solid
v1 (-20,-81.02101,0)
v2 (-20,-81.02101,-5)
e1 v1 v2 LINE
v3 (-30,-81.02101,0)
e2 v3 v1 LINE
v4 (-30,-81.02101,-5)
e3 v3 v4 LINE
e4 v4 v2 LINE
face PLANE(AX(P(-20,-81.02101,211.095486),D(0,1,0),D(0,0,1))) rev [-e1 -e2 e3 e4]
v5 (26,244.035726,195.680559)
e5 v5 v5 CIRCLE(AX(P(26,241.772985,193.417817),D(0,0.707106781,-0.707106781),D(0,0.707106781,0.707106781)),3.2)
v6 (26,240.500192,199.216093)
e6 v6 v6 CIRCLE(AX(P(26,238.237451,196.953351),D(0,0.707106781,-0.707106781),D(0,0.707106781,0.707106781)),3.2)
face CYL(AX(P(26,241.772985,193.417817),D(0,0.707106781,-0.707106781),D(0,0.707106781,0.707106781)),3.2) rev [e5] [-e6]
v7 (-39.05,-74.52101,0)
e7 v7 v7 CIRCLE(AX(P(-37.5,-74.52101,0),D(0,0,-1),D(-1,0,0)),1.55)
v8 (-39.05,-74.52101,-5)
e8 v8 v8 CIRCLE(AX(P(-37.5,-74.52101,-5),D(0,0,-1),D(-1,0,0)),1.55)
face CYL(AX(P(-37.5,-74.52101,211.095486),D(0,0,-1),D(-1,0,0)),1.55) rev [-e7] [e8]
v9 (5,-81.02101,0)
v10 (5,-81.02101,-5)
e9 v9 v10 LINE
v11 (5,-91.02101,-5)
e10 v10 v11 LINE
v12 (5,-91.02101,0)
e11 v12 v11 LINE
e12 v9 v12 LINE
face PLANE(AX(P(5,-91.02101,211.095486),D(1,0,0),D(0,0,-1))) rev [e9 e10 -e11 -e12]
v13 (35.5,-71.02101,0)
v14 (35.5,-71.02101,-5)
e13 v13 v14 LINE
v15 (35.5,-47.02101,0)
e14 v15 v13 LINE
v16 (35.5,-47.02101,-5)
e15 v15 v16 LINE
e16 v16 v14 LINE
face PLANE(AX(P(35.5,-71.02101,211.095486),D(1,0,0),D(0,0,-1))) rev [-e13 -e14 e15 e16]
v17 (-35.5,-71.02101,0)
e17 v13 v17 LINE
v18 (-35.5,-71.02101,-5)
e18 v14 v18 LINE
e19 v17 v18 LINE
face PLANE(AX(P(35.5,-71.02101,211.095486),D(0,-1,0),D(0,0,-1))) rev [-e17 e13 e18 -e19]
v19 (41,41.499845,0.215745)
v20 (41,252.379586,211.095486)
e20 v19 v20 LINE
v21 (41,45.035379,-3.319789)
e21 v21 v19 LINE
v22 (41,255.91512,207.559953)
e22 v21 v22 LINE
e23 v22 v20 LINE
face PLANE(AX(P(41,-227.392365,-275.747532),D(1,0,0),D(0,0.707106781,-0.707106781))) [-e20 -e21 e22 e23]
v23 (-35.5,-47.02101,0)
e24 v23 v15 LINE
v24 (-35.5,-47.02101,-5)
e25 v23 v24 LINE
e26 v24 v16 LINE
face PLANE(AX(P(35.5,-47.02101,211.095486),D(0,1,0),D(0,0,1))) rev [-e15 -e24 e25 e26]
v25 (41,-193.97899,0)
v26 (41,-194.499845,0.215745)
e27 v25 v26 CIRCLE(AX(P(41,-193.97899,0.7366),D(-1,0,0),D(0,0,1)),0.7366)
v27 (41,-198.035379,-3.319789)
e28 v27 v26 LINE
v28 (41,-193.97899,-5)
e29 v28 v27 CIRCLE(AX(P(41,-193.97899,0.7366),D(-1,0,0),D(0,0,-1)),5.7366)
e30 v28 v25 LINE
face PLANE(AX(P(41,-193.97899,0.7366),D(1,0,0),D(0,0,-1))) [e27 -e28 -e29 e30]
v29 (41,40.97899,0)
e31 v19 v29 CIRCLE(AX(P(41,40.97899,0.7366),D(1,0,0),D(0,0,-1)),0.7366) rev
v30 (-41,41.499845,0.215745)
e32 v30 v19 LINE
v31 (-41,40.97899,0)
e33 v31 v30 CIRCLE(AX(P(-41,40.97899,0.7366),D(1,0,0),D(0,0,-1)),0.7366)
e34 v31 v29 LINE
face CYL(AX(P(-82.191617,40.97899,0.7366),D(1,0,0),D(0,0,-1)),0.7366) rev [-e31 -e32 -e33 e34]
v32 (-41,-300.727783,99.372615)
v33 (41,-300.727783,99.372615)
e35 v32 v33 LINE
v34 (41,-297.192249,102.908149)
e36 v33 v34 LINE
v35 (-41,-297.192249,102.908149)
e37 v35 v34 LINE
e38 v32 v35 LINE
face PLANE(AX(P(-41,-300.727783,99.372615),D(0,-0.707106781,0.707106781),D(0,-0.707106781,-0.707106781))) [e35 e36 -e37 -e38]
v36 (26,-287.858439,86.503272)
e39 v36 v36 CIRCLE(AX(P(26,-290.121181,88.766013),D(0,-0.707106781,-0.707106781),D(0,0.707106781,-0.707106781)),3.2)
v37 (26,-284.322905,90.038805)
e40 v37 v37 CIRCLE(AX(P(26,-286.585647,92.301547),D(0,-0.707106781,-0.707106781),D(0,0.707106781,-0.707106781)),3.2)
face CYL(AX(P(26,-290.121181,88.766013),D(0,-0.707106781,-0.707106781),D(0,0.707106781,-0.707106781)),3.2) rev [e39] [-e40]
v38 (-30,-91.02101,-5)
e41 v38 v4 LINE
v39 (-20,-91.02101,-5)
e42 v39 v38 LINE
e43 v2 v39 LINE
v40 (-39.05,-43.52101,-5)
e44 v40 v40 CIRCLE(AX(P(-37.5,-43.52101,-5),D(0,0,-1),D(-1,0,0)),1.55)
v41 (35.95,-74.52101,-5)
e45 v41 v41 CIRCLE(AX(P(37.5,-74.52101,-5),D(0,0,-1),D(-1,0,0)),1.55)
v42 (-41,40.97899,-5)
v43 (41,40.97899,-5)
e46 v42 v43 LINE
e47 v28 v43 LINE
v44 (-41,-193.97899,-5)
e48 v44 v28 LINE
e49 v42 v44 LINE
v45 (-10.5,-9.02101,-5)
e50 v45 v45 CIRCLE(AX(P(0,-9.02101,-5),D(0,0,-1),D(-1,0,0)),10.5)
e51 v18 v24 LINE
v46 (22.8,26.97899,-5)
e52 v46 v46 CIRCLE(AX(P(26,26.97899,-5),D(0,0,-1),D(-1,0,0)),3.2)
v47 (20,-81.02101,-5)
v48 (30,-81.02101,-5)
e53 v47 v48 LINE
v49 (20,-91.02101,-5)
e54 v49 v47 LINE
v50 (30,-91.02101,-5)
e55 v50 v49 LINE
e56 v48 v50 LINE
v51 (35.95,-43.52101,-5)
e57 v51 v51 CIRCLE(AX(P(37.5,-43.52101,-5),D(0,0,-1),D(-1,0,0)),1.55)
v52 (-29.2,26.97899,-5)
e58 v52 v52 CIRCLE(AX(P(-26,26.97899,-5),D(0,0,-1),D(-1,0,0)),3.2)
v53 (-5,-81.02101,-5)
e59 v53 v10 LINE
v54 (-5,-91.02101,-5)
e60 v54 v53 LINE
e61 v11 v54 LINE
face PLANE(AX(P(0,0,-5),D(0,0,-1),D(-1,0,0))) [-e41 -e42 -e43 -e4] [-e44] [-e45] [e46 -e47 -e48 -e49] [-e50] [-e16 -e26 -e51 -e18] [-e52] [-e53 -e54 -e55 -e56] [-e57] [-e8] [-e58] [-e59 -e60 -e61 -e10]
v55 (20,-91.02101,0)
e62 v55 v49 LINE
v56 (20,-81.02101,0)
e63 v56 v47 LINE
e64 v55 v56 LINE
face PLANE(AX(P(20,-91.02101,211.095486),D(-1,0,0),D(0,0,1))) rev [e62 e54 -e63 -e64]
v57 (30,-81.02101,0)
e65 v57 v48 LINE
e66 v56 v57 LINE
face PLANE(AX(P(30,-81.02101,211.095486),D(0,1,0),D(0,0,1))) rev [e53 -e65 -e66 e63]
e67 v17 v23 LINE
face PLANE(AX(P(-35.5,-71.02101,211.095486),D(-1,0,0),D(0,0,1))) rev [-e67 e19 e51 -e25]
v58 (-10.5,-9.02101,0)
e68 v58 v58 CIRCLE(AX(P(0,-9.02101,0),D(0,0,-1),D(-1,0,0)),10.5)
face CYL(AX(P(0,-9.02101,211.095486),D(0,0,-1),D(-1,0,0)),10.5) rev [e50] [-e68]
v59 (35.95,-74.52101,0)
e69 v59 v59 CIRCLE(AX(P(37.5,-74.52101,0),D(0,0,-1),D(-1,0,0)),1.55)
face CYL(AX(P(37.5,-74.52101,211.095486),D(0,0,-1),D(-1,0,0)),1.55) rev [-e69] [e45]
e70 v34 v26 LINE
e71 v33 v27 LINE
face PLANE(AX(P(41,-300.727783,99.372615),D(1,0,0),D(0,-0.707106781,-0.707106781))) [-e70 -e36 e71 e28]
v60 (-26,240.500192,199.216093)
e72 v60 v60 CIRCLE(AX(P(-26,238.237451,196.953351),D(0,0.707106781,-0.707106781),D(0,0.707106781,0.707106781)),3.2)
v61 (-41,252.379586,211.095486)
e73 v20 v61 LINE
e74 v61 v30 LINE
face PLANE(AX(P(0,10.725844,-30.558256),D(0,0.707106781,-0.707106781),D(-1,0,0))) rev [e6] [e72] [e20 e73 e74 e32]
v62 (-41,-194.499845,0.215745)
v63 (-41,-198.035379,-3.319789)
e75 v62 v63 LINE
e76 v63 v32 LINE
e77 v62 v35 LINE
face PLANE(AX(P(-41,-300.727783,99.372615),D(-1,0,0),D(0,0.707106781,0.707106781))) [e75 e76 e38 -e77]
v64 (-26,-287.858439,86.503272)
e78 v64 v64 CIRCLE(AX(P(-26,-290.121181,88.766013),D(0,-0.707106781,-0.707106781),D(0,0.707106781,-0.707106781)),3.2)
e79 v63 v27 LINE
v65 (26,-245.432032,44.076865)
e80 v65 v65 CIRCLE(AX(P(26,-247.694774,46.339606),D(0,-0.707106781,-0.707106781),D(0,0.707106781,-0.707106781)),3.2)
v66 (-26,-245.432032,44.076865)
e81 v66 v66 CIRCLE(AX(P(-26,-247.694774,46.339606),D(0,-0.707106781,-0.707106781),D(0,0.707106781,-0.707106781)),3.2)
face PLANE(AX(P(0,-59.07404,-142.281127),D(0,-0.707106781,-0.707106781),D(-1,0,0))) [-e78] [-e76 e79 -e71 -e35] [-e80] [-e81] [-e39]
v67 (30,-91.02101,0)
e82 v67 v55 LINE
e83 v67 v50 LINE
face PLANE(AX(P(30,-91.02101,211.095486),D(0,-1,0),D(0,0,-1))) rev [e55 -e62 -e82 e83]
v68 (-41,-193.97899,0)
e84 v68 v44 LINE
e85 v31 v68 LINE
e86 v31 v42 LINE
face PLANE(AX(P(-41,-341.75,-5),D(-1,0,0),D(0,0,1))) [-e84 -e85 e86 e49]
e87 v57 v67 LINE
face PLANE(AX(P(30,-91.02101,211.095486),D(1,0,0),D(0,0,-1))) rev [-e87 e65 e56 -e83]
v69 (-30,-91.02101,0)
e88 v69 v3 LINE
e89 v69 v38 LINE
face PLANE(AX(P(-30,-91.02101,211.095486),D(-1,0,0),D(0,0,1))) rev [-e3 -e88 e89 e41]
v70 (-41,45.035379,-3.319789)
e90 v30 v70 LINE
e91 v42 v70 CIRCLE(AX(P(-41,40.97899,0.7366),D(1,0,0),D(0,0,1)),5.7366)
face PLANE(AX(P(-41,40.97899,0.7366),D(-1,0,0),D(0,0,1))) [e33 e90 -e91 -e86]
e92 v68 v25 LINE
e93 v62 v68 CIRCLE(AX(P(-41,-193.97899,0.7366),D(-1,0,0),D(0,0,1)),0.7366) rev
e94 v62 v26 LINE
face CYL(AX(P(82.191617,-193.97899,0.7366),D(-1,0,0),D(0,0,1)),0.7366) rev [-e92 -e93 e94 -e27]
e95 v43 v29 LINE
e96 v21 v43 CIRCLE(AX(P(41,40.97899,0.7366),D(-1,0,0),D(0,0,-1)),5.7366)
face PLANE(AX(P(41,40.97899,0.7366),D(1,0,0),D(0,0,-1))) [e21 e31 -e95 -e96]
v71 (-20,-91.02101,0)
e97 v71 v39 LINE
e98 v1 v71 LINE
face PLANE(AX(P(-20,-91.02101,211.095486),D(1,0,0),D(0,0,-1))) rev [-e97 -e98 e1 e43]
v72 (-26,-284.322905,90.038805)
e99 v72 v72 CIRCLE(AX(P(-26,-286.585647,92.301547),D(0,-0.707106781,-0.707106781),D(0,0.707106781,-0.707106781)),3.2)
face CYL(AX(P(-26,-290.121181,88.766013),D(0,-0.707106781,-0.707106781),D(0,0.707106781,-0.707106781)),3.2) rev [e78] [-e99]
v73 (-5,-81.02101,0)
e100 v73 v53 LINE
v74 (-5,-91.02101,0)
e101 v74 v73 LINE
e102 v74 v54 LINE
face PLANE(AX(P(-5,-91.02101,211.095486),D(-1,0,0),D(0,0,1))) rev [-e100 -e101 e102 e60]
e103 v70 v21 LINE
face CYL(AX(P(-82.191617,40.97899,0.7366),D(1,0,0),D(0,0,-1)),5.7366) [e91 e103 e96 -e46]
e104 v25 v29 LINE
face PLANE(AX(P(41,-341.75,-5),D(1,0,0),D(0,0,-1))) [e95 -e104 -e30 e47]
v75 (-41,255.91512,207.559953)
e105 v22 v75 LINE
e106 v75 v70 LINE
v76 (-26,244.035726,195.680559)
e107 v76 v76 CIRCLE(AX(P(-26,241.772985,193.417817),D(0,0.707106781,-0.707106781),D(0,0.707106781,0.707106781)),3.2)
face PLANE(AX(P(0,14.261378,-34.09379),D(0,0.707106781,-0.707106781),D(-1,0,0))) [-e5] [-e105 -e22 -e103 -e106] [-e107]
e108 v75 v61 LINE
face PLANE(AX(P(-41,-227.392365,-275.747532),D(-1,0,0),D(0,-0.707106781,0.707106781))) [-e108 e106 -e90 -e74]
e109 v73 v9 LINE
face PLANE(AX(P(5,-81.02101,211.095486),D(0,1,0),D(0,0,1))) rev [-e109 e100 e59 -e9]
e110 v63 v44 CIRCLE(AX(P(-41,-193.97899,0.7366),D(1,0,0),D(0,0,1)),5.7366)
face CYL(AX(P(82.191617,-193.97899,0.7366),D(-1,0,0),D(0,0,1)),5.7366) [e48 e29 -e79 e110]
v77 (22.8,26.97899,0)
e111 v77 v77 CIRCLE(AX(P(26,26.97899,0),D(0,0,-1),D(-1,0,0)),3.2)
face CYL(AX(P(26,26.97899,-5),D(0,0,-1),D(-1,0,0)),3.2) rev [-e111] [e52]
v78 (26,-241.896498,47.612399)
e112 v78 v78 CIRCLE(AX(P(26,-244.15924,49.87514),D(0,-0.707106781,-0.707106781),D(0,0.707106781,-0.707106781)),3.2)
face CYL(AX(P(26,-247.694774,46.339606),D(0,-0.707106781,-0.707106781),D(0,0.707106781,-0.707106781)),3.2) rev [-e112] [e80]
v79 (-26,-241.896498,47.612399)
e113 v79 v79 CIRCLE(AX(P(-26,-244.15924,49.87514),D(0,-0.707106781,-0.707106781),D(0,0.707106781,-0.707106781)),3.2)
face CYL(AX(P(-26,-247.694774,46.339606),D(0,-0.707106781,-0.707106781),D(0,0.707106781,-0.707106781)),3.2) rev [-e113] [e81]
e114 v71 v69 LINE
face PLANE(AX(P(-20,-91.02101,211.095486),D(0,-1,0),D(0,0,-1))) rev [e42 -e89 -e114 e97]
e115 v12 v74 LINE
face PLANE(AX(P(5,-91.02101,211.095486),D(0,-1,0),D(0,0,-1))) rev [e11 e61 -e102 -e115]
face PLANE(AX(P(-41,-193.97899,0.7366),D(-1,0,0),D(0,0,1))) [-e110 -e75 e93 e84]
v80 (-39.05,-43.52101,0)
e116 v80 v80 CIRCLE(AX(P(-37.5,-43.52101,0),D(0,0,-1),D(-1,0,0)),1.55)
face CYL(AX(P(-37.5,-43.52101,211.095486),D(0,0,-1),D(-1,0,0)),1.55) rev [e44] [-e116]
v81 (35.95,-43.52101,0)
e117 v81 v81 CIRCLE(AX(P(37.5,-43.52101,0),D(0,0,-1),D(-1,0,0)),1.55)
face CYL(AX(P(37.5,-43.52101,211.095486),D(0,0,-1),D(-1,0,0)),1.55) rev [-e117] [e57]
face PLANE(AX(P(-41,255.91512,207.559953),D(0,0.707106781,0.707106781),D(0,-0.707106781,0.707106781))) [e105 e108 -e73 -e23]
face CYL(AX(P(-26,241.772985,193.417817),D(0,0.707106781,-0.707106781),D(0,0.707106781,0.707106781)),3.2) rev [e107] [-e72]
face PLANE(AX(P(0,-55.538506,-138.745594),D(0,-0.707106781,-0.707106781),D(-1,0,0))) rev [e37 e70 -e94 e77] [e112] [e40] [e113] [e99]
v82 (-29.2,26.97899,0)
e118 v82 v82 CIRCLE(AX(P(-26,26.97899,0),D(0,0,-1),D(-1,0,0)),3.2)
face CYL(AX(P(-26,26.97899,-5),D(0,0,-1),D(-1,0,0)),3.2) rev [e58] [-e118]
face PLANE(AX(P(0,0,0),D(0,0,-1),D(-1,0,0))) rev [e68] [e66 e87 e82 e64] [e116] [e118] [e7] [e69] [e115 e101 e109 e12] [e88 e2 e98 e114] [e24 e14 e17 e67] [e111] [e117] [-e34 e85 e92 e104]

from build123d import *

# Parameters (mm, degrees)
SKETCH1_W                = 82
SKETCH1_H                = 683.5
BASE_FLANGE1_DEPTH       = 5
SKETCHED_START           = -41
SKETCHED_BEND1_DEPTH     = 82
SKETCHED_BEND1_2_DEPTH   = 82
M6_CLEARANCE_HOLE1_D     = 6.4
M6_CLEARANCE_HOLE1_DEPTH = 5
M6_CLEARANCE_HOLE1_TIP   = 1.922753981
SKETCH8_R                = 10.5
CUT_EXTRUDE1_DEPTH       = 373.579466057
SKETCH9_R                = 1.55
SKETCH9_W                = 71
SKETCH9_H                = 24
SKETCH9_W_2              = 10
SKETCH9_H_2              = 10
CUT_EXTRUDE2_DEPTH       = 373.579466057
M6_CLEARANCE_HOLE3_D     = 6.4
M6_CLEARANCE_HOLE3_DEPTH = 5
M6_CLEARANCE_HOLE3_TIP   = 1.922753981
M6_CLEARANCE_HOLE4_D     = 6.4
M6_CLEARANCE_HOLE4_DEPTH = 5
M6_CLEARANCE_HOLE4_TIP   = 1.922753981


# Read off the part's stored shape, not the designer's step: Sketched Bend1
# Sheet-metal steps are written as plain solids
with BuildPart() as part:
    # Sketch1 → Base-Flange1 (new body)
    with BuildSketch(Plane.XY):
        Rectangle(SKETCH1_W, SKETCH1_H)
    extrude(amount=-BASE_FLANGE1_DEPTH)

    # Sketched Bend1 outline → Sketched Bend1 (cut)
    with BuildSketch(Plane.YZ.offset(SKETCHED_START)):
        with BuildLine():
            Line((-341.75, -5), (-193.978990152, -5))
            ThreePointArc((-193.978990152, -5), (-196.17429193, -4.563327326), (-198.035378913, -3.319788761))
            Line((-198.035378913, -3.319788761), (-201.355167674, 0))
            Line((-201.355167674, 0), (-341.75, 0))
            Line((-341.75, 0), (-341.75, -5))
        make_face()
        with BuildLine():
            ThreePointArc((45.035378913, -3.319788761), (43.17429193, -4.563327326), (40.978990152, -5))
            Line((40.978990152, -5), (341.75, -5))
            Line((341.75, -5), (341.75, 0))
            Line((341.75, 0), (48.355167674, 0))
            Line((48.355167674, 0), (45.035378913, -3.319788761))
        make_face()
    extrude(amount=SKETCHED_BEND1_DEPTH, mode=Mode.SUBTRACT)

    # Sketched Bend1 2 outline → Sketched Bend1 2 (add)
    with BuildSketch(Plane.YZ.offset(SKETCHED_START)):
        with BuildLine():
            Line((-300.727782675, 99.372615001), (-201.355167674, 0))
            Line((-201.355167674, 0), (-193.978990152, 0))
            ThreePointArc((-193.978990152, 0), (-194.260874768, 0.056070336), (-194.499845007, 0.215745145))
            Line((-194.499845007, 0.215745145), (-297.192248769, 102.908148906))
            Line((-297.192248769, 102.908148906), (-300.727782675, 99.372615001))
        make_face()
        with BuildLine():
            Line((40.978990152, 0), (48.355167674, 0))
            Line((48.355167674, 0), (255.915120196, 207.559952522))
            Line((255.915120196, 207.559952522), (252.37958629, 211.095486428))
            Line((252.37958629, 211.095486428), (41.499845007, 0.215745145))
            ThreePointArc((41.499845007, 0.215745145), (41.260874768, 0.056070336), (40.978990152, 0))
        make_face()
    extrude(amount=SKETCHED_BEND1_2_DEPTH)

    # M6 Clearance Hole1
    with Locations(Plane(origin=(0, 0, -5), x_dir=(-1, 0, 0), z_dir=(0, 0, -1))):
        with Locations((-26, 26.978990152), (26, 26.978990152)):
            Hole(M6_CLEARANCE_HOLE1_D / 2, depth=M6_CLEARANCE_HOLE1_DEPTH)
            with Locations((0, 0, -(M6_CLEARANCE_HOLE1_DEPTH + M6_CLEARANCE_HOLE1_TIP / 2))):  # 118° drill point
                Cone(0, M6_CLEARANCE_HOLE1_D / 2, M6_CLEARANCE_HOLE1_TIP, mode=Mode.SUBTRACT)

    # Sketch8 → Cut-Extrude1 (cut, through all)
    with BuildSketch(Plane(origin=(0, 0, -5), x_dir=(-1, 0, 0), z_dir=(0, 0, -1))):
        with Locations((0, -9.021009848)):
            Circle(SKETCH8_R)
    extrude(amount=-CUT_EXTRUDE1_DEPTH, mode=Mode.SUBTRACT)

    # Sketch9 → Cut-Extrude2 (cut, through all)
    with BuildSketch(Plane(origin=(0, 0, -5), x_dir=(-1, 0, 0), z_dir=(0, 0, -1))):
        with Locations((-37.5, -43.521009848)):
            Circle(SKETCH9_R)
        with Locations((-37.5, -74.521009848)):
            Circle(SKETCH9_R)
        with Locations((37.5, -74.521009848)):
            Circle(SKETCH9_R)
        with Locations((37.5, -43.521009848)):
            Circle(SKETCH9_R)
        with Locations((0, -59.021009848)):
            Rectangle(SKETCH9_W, SKETCH9_H)
        with Locations((0, -86.021009848)):
            Rectangle(SKETCH9_W_2, SKETCH9_H_2)
        with Locations((-25, -86.021009848)):
            Rectangle(SKETCH9_W_2, SKETCH9_H_2)
        with Locations((25, -86.021009848)):
            Rectangle(SKETCH9_W_2, SKETCH9_H_2)
    extrude(amount=-CUT_EXTRUDE2_DEPTH, mode=Mode.SUBTRACT)

    # M6 Clearance Hole3
    with Locations(Plane(origin=(0, -100.677583837, -100.677583837), x_dir=(-1, 0, 0), z_dir=(0, -0.7071067811865487, -0.7071067811865465))):
        with Locations((-26, -207.913704352), (26, -207.913704352), (26, -267.913704352), (-26, -267.913704352)):
            Hole(M6_CLEARANCE_HOLE3_D / 2, depth=M6_CLEARANCE_HOLE3_DEPTH)
            with Locations((0, 0, -(M6_CLEARANCE_HOLE3_DEPTH + M6_CLEARANCE_HOLE3_TIP / 2))):  # 118° drill point
                Cone(0, M6_CLEARANCE_HOLE3_D / 2, M6_CLEARANCE_HOLE3_TIP, mode=Mode.SUBTRACT)

    # M6 Clearance Hole4
    with Locations(Plane(origin=(0, 24.177583837, -24.177583837), x_dir=(1, 0, 0), z_dir=(0, 0.7071067811865487, -0.7071067811865465))):
        with Locations((-26, -307.72636683), (26, -307.72636683)):
            Hole(M6_CLEARANCE_HOLE4_D / 2, depth=M6_CLEARANCE_HOLE4_DEPTH)
            with Locations((0, 0, -(M6_CLEARANCE_HOLE4_DEPTH + M6_CLEARANCE_HOLE4_TIP / 2))):  # 118° drill point
                Cone(0, M6_CLEARANCE_HOLE4_D / 2, M6_CLEARANCE_HOLE4_TIP, mode=Mode.SUBTRACT)


solid = part.part
